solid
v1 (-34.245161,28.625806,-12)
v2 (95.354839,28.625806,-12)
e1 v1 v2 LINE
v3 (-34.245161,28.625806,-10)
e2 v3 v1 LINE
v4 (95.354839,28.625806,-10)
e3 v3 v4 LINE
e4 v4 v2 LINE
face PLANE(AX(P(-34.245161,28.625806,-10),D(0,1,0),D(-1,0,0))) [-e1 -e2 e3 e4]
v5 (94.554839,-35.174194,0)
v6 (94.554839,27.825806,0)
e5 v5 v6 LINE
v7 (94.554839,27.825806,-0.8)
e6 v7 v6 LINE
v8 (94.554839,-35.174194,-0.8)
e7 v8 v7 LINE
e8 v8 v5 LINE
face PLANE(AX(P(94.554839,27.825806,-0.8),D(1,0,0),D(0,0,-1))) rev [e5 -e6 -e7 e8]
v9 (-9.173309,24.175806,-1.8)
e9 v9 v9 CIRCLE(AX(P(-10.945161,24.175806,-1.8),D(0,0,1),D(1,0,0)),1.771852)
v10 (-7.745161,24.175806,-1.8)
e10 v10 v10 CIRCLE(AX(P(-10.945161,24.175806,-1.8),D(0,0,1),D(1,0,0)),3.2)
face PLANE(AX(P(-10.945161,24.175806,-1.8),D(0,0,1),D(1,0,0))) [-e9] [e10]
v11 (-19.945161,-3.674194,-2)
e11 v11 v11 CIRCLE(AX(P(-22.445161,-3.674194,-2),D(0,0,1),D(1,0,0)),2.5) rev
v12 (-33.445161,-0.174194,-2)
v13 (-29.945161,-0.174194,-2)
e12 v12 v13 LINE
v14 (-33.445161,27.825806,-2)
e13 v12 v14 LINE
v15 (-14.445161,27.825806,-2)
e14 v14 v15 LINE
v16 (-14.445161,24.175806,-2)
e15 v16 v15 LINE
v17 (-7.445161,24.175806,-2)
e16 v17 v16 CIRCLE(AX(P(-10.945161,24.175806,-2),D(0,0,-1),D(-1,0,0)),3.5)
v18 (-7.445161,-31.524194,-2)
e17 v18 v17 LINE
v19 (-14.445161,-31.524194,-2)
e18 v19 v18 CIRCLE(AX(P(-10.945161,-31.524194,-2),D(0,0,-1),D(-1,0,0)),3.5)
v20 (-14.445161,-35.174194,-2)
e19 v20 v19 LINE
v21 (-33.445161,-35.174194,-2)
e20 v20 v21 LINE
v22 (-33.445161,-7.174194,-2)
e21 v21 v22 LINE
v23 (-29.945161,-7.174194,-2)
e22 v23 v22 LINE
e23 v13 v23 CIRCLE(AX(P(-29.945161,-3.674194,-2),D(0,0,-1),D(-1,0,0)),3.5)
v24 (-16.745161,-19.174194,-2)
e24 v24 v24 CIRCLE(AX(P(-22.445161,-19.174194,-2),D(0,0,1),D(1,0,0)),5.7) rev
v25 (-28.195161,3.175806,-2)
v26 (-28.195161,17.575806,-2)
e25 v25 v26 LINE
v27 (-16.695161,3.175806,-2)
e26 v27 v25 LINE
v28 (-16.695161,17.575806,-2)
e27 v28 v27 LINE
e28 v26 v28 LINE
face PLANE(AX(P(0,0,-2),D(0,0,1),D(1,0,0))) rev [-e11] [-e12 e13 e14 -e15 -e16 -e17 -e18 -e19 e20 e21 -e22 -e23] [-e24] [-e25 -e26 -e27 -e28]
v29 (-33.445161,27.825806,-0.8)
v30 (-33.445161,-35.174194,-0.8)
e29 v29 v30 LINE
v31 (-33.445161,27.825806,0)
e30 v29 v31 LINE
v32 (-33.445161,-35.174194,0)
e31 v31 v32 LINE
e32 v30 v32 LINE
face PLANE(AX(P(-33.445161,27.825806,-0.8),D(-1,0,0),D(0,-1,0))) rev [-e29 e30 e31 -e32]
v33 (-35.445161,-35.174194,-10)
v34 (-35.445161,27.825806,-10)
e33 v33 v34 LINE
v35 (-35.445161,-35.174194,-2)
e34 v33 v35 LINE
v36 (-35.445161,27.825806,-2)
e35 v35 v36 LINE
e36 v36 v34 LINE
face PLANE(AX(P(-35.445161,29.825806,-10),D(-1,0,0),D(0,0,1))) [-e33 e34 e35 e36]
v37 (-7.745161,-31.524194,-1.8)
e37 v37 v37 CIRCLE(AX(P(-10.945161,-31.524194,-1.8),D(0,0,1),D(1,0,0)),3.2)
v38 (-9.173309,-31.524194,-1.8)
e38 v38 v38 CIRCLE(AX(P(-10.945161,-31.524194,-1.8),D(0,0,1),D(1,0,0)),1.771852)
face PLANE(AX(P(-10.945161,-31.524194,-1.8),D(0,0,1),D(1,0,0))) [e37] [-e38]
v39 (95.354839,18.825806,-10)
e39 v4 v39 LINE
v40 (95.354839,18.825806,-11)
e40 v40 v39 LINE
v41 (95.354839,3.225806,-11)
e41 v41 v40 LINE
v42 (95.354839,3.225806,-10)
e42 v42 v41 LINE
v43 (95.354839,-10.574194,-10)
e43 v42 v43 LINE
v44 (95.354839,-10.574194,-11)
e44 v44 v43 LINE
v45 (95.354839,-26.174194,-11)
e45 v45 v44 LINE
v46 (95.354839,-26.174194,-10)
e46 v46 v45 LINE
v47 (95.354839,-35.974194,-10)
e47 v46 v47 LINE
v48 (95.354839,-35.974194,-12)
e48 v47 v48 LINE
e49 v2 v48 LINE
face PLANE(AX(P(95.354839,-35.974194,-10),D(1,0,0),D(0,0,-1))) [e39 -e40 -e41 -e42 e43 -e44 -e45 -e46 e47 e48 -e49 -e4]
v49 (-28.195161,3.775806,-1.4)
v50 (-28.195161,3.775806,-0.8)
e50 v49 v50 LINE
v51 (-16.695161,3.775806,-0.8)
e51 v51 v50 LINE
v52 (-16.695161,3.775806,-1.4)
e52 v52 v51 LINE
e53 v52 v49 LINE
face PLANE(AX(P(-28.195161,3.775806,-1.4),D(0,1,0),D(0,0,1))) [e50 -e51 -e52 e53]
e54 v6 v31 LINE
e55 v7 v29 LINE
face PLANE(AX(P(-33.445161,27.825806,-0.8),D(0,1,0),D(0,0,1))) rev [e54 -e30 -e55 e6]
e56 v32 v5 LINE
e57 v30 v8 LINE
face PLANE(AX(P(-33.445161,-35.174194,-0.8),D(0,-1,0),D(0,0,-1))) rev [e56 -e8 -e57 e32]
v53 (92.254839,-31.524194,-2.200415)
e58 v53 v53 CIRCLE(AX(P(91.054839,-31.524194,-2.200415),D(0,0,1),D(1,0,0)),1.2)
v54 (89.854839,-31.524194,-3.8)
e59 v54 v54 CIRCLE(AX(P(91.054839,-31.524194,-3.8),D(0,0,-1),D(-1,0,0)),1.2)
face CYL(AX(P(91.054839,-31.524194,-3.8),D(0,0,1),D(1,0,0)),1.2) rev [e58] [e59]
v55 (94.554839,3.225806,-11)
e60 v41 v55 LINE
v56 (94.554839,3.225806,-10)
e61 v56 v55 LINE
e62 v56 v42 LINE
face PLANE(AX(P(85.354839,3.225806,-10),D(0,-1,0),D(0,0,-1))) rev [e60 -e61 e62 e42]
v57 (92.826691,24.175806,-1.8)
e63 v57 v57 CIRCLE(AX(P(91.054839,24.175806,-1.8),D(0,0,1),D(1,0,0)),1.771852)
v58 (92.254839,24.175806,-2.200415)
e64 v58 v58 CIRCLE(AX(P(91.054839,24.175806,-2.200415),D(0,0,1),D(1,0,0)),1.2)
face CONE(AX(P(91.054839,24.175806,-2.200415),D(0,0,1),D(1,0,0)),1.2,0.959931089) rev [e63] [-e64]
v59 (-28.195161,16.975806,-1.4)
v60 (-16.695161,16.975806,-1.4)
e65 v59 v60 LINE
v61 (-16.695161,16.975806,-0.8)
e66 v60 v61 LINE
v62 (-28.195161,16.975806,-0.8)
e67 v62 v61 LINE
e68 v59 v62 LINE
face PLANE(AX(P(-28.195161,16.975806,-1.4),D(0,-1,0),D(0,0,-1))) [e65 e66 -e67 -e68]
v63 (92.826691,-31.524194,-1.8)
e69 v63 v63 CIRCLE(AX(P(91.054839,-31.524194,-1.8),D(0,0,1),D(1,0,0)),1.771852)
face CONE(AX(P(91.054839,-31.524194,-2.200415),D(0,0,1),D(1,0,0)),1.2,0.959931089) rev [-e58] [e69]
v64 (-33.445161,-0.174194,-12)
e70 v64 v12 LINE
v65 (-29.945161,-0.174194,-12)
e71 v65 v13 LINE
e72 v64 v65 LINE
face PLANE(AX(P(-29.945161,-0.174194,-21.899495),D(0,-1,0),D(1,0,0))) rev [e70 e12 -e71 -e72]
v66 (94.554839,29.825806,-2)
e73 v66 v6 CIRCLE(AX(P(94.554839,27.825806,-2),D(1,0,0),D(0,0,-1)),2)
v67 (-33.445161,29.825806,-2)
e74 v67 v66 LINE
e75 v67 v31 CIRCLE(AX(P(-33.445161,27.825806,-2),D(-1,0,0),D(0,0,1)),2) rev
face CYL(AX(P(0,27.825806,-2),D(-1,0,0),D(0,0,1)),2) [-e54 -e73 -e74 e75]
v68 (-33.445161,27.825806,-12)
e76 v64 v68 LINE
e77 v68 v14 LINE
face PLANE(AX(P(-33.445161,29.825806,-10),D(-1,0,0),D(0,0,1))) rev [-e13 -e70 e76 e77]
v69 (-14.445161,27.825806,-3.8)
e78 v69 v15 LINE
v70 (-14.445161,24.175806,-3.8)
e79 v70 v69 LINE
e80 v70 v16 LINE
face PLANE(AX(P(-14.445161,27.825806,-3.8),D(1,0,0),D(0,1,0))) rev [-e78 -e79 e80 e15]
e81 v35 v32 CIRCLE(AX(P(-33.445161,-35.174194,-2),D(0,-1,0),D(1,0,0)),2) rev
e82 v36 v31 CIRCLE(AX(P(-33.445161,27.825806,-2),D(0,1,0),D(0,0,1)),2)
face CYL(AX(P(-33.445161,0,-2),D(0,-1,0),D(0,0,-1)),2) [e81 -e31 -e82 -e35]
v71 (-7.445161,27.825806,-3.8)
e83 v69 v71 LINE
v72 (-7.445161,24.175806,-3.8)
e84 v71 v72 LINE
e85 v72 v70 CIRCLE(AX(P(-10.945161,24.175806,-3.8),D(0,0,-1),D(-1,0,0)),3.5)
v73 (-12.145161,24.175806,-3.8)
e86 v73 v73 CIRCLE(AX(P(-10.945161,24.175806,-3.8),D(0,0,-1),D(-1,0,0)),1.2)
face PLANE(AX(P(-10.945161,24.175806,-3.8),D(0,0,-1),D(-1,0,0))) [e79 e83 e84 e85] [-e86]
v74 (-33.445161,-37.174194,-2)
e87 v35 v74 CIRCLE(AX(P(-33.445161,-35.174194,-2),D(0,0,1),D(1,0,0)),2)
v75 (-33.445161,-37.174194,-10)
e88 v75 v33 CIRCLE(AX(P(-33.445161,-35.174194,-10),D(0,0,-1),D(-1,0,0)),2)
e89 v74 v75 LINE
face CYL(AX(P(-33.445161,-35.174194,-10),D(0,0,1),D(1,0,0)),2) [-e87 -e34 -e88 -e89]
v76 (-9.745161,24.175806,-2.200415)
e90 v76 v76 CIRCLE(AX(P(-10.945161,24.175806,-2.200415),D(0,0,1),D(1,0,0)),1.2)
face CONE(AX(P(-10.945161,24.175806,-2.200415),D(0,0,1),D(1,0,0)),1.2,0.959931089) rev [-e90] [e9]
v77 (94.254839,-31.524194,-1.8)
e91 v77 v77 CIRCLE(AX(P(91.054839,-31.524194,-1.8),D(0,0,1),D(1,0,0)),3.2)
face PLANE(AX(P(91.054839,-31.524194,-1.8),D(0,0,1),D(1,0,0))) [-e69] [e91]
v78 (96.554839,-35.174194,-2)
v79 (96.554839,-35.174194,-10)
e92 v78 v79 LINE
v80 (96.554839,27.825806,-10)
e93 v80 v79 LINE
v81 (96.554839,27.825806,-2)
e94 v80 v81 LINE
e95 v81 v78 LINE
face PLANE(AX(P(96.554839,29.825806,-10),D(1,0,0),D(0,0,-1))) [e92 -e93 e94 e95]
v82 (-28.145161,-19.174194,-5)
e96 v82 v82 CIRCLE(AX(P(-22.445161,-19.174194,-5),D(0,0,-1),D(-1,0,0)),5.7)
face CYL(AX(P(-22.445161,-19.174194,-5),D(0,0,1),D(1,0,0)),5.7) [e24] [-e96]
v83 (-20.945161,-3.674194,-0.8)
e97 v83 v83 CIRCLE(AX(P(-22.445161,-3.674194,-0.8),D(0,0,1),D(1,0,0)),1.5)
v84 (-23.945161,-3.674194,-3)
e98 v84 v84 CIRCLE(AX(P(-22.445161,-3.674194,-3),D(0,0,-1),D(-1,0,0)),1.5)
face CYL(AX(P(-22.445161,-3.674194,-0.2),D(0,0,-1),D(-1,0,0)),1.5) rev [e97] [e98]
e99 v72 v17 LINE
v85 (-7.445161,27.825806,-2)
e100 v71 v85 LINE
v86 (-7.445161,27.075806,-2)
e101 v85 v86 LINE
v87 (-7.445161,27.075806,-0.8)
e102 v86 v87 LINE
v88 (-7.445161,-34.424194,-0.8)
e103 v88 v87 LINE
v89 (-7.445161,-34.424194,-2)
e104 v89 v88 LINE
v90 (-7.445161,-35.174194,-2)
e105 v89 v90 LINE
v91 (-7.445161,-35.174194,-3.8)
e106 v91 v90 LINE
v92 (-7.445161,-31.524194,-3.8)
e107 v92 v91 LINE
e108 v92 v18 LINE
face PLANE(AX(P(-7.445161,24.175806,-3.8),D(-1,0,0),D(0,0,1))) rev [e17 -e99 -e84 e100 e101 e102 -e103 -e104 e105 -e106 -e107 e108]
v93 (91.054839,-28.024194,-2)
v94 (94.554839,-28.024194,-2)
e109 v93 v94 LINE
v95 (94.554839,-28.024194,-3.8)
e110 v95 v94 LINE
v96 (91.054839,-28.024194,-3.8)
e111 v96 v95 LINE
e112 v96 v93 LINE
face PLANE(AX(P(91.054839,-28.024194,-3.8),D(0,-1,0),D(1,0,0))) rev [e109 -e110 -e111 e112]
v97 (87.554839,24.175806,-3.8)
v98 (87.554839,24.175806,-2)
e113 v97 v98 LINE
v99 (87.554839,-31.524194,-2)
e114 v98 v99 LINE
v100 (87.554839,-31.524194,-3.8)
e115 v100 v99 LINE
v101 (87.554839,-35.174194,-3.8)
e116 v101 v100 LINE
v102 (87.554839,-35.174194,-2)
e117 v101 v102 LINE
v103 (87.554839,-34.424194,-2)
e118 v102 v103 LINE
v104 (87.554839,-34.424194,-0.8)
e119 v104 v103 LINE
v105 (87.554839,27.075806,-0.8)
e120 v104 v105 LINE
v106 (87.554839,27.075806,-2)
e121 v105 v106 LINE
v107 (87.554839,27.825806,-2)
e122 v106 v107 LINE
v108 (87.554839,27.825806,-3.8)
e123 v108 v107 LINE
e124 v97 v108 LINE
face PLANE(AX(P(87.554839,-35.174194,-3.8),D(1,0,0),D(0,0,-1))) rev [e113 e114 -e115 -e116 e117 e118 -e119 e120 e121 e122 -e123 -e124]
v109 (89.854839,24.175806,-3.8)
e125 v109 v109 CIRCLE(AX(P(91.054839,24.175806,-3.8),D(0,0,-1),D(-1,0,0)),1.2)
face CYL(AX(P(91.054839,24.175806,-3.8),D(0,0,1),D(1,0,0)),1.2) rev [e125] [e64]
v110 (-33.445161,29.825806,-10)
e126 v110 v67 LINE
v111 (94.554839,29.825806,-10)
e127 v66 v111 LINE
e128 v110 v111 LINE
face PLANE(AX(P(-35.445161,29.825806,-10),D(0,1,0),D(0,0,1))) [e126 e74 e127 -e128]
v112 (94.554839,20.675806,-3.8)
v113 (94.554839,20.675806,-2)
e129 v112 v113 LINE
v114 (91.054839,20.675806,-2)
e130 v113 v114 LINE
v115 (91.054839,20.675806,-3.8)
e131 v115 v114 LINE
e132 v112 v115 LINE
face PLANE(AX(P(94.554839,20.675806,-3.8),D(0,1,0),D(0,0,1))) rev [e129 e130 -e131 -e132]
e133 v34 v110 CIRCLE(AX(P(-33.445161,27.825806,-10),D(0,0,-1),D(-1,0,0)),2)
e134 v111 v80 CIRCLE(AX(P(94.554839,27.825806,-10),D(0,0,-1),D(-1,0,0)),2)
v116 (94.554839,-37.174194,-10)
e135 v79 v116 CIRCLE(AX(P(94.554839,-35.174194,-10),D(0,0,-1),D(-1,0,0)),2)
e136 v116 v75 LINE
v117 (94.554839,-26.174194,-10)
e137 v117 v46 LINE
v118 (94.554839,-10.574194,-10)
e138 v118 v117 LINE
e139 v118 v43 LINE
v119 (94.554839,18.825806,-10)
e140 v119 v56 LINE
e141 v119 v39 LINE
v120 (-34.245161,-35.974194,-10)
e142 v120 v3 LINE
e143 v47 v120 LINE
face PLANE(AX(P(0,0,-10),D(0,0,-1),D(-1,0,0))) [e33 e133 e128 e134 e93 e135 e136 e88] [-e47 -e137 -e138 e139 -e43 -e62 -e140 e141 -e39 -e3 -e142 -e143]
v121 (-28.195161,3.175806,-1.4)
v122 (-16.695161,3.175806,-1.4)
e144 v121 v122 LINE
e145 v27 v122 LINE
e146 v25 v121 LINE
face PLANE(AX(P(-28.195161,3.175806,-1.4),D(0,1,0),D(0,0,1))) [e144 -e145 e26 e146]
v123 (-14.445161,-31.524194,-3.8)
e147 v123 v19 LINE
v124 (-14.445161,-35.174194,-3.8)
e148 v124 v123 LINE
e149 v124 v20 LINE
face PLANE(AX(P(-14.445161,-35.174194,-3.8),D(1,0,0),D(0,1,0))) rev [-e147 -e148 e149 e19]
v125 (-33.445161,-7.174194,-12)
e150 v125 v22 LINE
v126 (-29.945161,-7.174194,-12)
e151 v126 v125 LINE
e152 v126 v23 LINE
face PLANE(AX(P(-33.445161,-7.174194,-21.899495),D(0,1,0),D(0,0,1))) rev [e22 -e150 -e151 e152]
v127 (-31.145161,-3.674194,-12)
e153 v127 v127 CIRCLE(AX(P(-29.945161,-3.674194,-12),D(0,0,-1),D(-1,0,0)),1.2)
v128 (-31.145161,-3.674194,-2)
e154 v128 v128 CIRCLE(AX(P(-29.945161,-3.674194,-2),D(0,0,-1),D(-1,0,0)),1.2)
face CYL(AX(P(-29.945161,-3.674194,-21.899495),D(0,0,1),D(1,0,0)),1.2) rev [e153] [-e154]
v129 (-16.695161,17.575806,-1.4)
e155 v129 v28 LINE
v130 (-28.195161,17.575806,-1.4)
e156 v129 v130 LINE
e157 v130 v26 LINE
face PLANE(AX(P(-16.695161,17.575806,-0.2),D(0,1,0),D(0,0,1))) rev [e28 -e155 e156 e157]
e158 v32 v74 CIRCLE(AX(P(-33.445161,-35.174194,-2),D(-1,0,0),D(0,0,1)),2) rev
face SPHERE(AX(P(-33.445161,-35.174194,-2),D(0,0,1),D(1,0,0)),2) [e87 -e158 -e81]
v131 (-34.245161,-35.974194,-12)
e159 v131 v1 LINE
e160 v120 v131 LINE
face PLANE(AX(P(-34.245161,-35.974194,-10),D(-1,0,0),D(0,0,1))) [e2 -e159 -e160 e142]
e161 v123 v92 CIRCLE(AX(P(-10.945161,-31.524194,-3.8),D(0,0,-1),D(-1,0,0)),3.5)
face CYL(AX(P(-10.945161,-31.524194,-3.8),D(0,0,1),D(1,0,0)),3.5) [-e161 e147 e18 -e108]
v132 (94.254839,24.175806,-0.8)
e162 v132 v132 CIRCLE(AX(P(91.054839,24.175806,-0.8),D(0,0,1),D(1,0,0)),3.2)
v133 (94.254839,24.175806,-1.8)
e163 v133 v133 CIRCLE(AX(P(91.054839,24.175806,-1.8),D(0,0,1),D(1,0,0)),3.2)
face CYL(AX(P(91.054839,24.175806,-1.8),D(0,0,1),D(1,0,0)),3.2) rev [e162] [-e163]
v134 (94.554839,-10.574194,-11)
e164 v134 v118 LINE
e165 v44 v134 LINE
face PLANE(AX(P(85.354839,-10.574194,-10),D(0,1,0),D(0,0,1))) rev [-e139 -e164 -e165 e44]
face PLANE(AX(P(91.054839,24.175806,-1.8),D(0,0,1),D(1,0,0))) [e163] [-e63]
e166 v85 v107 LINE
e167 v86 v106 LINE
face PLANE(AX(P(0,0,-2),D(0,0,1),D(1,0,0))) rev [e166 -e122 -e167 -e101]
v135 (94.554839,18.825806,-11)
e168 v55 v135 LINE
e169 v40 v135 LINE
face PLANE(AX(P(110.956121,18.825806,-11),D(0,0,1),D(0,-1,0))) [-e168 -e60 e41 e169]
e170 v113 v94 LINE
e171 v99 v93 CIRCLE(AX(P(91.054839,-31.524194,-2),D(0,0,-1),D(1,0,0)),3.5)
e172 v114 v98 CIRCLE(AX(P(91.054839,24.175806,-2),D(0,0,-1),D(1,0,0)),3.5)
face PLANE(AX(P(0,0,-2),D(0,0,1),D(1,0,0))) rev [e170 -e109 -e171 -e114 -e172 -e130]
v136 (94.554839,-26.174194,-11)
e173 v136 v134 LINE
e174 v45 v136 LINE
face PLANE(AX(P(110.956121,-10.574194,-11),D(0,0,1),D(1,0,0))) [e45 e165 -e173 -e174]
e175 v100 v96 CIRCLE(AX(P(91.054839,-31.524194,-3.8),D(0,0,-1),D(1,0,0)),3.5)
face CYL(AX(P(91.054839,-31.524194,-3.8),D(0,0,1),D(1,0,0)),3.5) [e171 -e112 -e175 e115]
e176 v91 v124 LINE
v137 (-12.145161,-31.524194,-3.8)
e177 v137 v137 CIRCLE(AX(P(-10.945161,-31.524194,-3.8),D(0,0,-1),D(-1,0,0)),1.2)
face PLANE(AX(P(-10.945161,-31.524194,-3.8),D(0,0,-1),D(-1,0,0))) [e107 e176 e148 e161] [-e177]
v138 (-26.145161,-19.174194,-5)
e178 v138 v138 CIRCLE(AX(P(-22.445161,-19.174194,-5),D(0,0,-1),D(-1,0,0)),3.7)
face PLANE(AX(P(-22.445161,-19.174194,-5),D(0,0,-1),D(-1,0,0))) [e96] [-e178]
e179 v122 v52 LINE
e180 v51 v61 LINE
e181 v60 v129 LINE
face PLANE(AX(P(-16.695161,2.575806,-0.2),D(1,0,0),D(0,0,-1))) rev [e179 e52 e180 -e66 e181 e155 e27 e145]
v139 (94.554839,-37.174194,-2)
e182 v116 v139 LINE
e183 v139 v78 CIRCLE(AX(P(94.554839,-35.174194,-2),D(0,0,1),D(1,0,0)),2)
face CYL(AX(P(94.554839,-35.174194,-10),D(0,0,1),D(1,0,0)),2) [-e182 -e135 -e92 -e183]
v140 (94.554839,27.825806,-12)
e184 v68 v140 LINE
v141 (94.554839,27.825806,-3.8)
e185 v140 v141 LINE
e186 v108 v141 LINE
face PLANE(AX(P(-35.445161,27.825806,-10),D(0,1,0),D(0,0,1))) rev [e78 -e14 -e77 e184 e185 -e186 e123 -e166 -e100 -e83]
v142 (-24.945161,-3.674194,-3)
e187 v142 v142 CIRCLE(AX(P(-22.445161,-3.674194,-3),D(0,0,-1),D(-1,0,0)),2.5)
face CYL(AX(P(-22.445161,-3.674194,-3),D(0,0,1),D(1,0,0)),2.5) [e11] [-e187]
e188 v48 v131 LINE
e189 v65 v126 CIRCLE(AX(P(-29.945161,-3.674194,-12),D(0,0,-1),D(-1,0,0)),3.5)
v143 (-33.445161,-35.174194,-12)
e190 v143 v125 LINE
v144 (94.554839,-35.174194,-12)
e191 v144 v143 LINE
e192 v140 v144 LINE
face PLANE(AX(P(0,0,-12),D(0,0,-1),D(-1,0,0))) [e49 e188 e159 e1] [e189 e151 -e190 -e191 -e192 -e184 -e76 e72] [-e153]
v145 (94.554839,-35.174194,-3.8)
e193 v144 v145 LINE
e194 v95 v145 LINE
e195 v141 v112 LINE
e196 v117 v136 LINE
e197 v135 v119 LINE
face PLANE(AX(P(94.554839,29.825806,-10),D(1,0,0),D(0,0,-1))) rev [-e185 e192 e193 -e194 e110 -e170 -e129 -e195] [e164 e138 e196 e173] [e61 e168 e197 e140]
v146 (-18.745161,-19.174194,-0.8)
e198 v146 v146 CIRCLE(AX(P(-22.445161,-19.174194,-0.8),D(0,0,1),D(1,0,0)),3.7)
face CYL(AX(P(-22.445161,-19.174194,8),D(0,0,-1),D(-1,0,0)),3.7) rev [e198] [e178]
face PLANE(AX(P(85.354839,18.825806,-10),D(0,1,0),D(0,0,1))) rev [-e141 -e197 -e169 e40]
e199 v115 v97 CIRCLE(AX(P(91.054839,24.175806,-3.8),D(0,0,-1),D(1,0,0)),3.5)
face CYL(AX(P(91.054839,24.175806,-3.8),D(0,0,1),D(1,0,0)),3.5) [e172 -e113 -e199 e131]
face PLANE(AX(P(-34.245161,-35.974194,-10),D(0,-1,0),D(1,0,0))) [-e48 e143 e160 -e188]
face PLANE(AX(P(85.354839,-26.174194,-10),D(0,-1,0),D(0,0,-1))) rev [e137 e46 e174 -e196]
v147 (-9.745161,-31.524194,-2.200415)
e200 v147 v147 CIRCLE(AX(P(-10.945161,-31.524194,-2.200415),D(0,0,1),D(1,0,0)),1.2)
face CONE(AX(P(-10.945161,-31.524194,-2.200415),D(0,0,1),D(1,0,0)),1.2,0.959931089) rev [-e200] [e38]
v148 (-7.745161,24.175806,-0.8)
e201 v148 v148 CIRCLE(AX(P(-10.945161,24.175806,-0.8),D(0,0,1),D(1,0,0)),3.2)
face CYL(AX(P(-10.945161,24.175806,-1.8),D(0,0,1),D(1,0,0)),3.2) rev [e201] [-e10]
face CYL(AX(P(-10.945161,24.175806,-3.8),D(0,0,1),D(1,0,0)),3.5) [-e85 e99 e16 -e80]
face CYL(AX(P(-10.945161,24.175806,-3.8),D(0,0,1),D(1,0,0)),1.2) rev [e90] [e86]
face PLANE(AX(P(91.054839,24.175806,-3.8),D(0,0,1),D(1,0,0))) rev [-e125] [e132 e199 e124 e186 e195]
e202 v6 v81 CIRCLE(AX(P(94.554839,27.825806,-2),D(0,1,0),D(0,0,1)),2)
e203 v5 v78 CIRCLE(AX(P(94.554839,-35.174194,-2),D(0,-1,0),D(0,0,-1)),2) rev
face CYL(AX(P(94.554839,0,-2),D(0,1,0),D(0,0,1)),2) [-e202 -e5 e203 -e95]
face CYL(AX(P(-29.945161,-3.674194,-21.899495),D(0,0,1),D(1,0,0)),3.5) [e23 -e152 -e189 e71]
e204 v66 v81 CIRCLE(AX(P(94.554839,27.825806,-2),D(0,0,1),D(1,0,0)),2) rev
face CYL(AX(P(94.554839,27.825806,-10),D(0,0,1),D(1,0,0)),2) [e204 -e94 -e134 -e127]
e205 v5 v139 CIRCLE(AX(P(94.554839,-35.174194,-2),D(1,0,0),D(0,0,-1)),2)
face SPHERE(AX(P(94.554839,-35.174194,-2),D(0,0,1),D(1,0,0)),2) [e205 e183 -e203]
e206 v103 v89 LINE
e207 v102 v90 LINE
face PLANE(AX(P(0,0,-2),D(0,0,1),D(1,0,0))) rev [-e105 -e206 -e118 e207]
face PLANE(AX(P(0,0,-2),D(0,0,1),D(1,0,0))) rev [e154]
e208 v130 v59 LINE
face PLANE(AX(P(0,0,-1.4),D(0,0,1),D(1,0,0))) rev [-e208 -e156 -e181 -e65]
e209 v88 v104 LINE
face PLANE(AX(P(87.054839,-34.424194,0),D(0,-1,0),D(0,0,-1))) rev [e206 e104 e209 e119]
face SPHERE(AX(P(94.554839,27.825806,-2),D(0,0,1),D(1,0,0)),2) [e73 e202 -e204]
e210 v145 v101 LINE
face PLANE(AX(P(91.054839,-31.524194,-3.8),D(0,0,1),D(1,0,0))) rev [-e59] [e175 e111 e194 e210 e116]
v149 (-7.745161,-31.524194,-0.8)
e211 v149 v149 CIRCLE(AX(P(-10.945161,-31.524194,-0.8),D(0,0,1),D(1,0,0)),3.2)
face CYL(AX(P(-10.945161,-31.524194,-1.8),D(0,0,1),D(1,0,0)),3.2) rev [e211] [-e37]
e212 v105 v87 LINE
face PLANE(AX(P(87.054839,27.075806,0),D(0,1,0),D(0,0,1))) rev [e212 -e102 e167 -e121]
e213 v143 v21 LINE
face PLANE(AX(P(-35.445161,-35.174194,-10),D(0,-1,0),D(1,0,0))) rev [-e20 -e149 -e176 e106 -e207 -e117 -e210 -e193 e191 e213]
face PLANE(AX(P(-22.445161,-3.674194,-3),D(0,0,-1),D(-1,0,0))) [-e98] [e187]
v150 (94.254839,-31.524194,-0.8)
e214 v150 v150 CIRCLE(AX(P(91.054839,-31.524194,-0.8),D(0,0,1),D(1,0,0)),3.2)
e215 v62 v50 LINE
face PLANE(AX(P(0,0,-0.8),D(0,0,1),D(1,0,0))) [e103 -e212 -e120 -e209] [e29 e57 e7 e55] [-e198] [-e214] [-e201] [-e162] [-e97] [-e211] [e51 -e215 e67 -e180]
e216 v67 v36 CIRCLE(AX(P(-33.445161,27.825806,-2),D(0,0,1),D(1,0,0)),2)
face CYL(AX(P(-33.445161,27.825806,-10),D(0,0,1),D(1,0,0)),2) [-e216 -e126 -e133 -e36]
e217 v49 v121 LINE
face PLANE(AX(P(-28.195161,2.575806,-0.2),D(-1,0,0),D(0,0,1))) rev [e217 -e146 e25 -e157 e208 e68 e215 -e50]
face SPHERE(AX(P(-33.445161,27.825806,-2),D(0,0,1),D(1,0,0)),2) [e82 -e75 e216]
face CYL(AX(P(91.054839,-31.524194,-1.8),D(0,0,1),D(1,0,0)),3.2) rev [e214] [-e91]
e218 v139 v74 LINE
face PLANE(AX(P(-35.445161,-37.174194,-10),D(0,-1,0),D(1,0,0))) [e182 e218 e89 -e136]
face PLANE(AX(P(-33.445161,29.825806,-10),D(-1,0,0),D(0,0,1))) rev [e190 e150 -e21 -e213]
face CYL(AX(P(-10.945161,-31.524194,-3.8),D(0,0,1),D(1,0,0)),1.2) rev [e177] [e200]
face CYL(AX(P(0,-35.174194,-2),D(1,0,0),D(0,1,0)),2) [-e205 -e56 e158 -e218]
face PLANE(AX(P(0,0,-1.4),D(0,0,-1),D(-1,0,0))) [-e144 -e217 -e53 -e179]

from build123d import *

# Parameters (mm, degrees)
SKETCH_1_W           = 132
SKETCH_1_H           = 67
EXTRUDE_1_DEPTH      = 10
SHELL_1_T            = -2
SKETCH_3_W           = 132
SKETCH_3_H           = 67
SKETCH_3_W_2         = 130.4
SKETCH_3_H_2         = 65.4
EXTRUDE_2_DEPTH      = 2
SKETCH_4_W           = 132
SKETCH_4_H           = 67
EXTRUDE_3_DEPTH      = 2
SKETCH_5_W           = 85
SKETCH_5_H           = 57
CUT_EXTRUDE_2_DEPTH  = 2
SKETCH_6_R           = 3.5
CUT_EXTRUDE_3_DEPTH  = 2
SKETCH_7_W           = 127
SKETCH_7_H           = 62
CUT_EXTRUDE_4_DEPTH  = 0.8
SKETCH_8_W           = 0.8
SKETCH_8_H           = 17.8
EXTRUDE_4_DEPTH      = 1.2
SKETCH_9_W           = 130.4
SKETCH_9_H           = 65.4
SKETCH_9_W_2         = 128
SKETCH_9_H_2         = 63
EXTRUDE_5_DEPTH      = 2
SKETCH_10_W          = 132
SKETCH_10_H          = 67
SKETCH_10_W_2        = 129.6
SKETCH_10_H_2        = 64.6
CUT_EXTRUDE_5_DEPTH  = 2
SKETCH_11_W          = 95
SKETCH_11_H          = 61.5
CUT_EXTRUDE_6_DEPTH  = 2
SKETCH_12_W          = 128
SKETCH_12_H          = 63
CUT_EXTRUDE_7_DEPTH  = 0.8
SKETCH_14_R          = 1.2
EXTRUDE_6_DEPTH      = 1.8
SKETCH_15_W          = 0.5
SKETCH_15_H          = 61.5
EXTRUDE_7_DEPTH      = 1.2
SKETCH_16_W          = 0.5
SKETCH_16_H          = 61.5
CUT_EXTRUDE_8_DEPTH  = 1.8
CUT_EXTRUDE_START    = -1.8
SKETCH_17_R          = 1.2
CUT_EXTRUDE_9_DEPTH  = 1.8
SKETCH_19_R          = 3.5
CUT_EXTRUDE_11_DEPTH = 1.8
SKETCH_22_R          = 3.5
EXTRUDE_9_DEPTH      = 1.2
SKETCH_23_R          = 1.5
SKETCH_23_W          = 11.5
SKETCH_23_H          = 15
CUT_EXTRUDE_13_DEPTH = 1.8
EXTRUDE_START        = 1
SKETCH_24_R          = 2.5
SKETCH_24_R_2        = 1.5
EXTRUDE_10_DEPTH     = 1
CHAMFER_1_SIZE       = 2
CHAMFER_1_SIZE2      = 1.400415076
SKETCH_25_R          = 1.2
EXTRUDE_11_DEPTH     = 10
SKETCH_26_W          = 1.2
SKETCH_26_H          = 15.6
CUT_EXTRUDE_14_DEPTH = 10
SKETCH_27_W          = 11.5
SKETCH_27_H          = 0.6
EXTRUDE_12_DEPTH     = 0.6
FILLET_1_R           = 2
SKETCH_28_R          = 3.7
CUT_EXTRUDE_15_DEPTH = 10
EXTRUDE_START_2      = 3
SKETCH_29_R          = 5.7
SKETCH_29_R_2        = 3.7
EXTRUDE_13_DEPTH     = 3
SKETCH_30_W          = 11.5
SKETCH_30_H          = 0.6
EXTRUDE_14_DEPTH     = 0.6
SKETCH_32_W          = 11.5
SKETCH_32_H          = 0.6
EXTRUDE_15_DEPTH     = 0.6
SKETCH_33_W          = 0.2
SKETCH_33_H          = 15.6
EXTRUDE_16_DEPTH     = 0.8
SKETCH_34_R          = 3.2
CUT_EXTRUDE_16_DEPTH = 1
SKETCH_35_R          = 3.2
CUT_EXTRUDE_17_DEPTH = 1


with BuildPart() as part:
    # Эскиз1 → Бобышка-Вытянуть1 (new body)
    with BuildSketch(Plane.XY):
        with Locations((30.55483871, -3.674193548)):
            Rectangle(SKETCH_1_W, SKETCH_1_H)
    extrude(amount=-EXTRUDE_1_DEPTH)

    # Оболочка1
    shell_1_openings = [part.faces().sort_by_distance(p)[0] for p in [
        (30.55483871, -3.674193548, -10),
        (30.55483871, -3.674193548, 0),
    ]]
    offset(amount=SHELL_1_T, openings=shell_1_openings, kind=Kind.INTERSECTION)

    # Эскиз3 → Бобышка-Вытянуть2 (add)
    with BuildSketch(Plane(origin=(0, 0, -10), x_dir=(-1, 0, 0), z_dir=(0, 0, -1))):
        with Locations((-30.55483871, -3.674193548)):
            Rectangle(SKETCH_3_W, SKETCH_3_H)
        with Locations((-30.55483871, -3.674193548)):
            Rectangle(SKETCH_3_W_2, SKETCH_3_H_2, mode=Mode.SUBTRACT)
    extrude(amount=EXTRUDE_2_DEPTH)

    # Эскиз4 → Бобышка-Вытянуть3 (add)
    with BuildSketch(Plane.XY):
        with Locations((30.55483871, -3.674193548)):
            Rectangle(SKETCH_4_W, SKETCH_4_H)
    extrude(amount=-EXTRUDE_3_DEPTH)

    # Эскиз5 → Вырез-Вытянуть2 (cut)
    with BuildSketch(Plane(origin=(0, 0, -2), x_dir=(-1, 0, 0), z_dir=(0, 0, -1))):
        with Locations((-43.05483871, -3.674193548)):
            Rectangle(SKETCH_5_W, SKETCH_5_H)
    extrude(amount=-CUT_EXTRUDE_2_DEPTH, mode=Mode.SUBTRACT)

    # Эскиз6 → Вырез-Вытянуть3 (cut)
    with BuildSketch(Plane(origin=(0, 0, -2), x_dir=(-1, 0, 0), z_dir=(0, 0, -1))):
        with Locations((21.94516129, -3.674193548)):
            Circle(SKETCH_6_R)
    extrude(amount=-CUT_EXTRUDE_3_DEPTH, mode=Mode.SUBTRACT)

    # Эскиз7 → Вырез-Вытянуть4 (cut)
    with BuildSketch(Plane.XY):
        with Locations((30.55483871, -3.674193548)):
            Rectangle(SKETCH_7_W, SKETCH_7_H)
    extrude(amount=-CUT_EXTRUDE_4_DEPTH, mode=Mode.SUBTRACT)

    # Эскиз8 → Бобышка-Вытянуть4 (add)
    with BuildSketch(Plane.ZY.offset(-95.75483871)):
        with Locations((-11.6, 14.525806452)):
            Rectangle(SKETCH_8_W, SKETCH_8_H)
        with Locations((-11.6, -21.874193548)):
            Rectangle(SKETCH_8_W, SKETCH_8_H)
    extrude(amount=EXTRUDE_4_DEPTH)

    # Эскиз9 → Бобышка-Вытянуть5 (add)
    with BuildSketch(Plane(origin=(0, 0, -12), x_dir=(-1, 0, 0), z_dir=(0, 0, -1))):
        with Locations((-30.55483871, -3.674193548)):
            Rectangle(SKETCH_9_W, SKETCH_9_H)
        with Locations((-30.55483871, -3.674193548)):
            Rectangle(SKETCH_9_W_2, SKETCH_9_H_2, mode=Mode.SUBTRACT)
    extrude(amount=-EXTRUDE_5_DEPTH)

    # Эскиз10 → Вырез-Вытянуть5 (cut)
    with BuildSketch(Plane(origin=(0, 0, -12), x_dir=(-1, 0, 0), z_dir=(0, 0, -1))):
        with Locations((-30.55483871, -3.674193548)):
            Rectangle(SKETCH_10_W, SKETCH_10_H)
        with Locations((-30.55483871, -3.674193548)):
            Rectangle(SKETCH_10_W_2, SKETCH_10_H_2, mode=Mode.SUBTRACT)
    extrude(amount=-CUT_EXTRUDE_5_DEPTH, mode=Mode.SUBTRACT)

    # Эскиз11 → Вырез-Вытянуть6 (cut)
    with BuildSketch(Plane(origin=(0, 0, -2), x_dir=(-1, 0, 0), z_dir=(0, 0, -1))):
        with Locations((-39.55483871, -3.674193548)):
            Rectangle(SKETCH_11_W, SKETCH_11_H)
    extrude(amount=-CUT_EXTRUDE_6_DEPTH, mode=Mode.SUBTRACT)

    # Эскиз12 → Вырез-Вытянуть7 (cut)
    with BuildSketch(Plane.XY):
        with Locations((30.55483871, -3.674193548)):
            Rectangle(SKETCH_12_W, SKETCH_12_H)
    extrude(amount=-CUT_EXTRUDE_7_DEPTH, mode=Mode.SUBTRACT)

    # Эскиз14 → Бобышка-Вытянуть6 (add)
    # profile 1 of 4: a face of its own
    with BuildSketch(Plane(origin=(0, 0, -2), x_dir=(-1, 0, 0), z_dir=(0, 0, -1))):
        with BuildLine():
            Line((-94.55483871, -28.024193548), (-94.55483871, -35.174193548))
            Line((-94.55483871, -35.174193548), (-87.55483871, -35.174193548))
            Line((-87.55483871, -35.174193548), (-87.55483871, -31.524193548))
            ThreePointArc((-87.55483871, -31.524193548), (-88.579964976, -29.049319814), (-91.05483871, -28.024193548))
            Line((-91.05483871, -28.024193548), (-94.55483871, -28.024193548))
        make_face()
        with Locations((-91.05483871, -31.524193548)):
            Circle(SKETCH_14_R, mode=Mode.SUBTRACT)
    # profile 2 of 4: a face of its own
    with BuildSketch(Plane(origin=(0, 0, -2), x_dir=(-1, 0, 0), z_dir=(0, 0, -1))):
        with BuildLine():
            Line((-87.55483871, 24.175806452), (-87.55483871, 27.825806452))
            Line((-87.55483871, 27.825806452), (-94.55483871, 27.825806452))
            Line((-94.55483871, 27.825806452), (-94.55483871, 20.675806452))
            Line((-94.55483871, 20.675806452), (-91.05483871, 20.675806452))
            ThreePointArc((-91.05483871, 20.675806452), (-88.579964976, 21.700932717), (-87.55483871, 24.175806452))
        make_face()
        with Locations((-91.05483871, 24.175806452)):
            Circle(SKETCH_14_R, mode=Mode.SUBTRACT)
    # profile 3 of 4: a face of its own
    with BuildSketch(Plane(origin=(0, 0, -2), x_dir=(-1, 0, 0), z_dir=(0, 0, -1))):
        with BuildLine():
            Line((7.44516129, 24.175806452), (7.44516129, 27.825806452))
            Line((7.44516129, 27.825806452), (14.44516129, 27.825806452))
            Line((14.44516129, 27.825806452), (14.44516129, 24.175806452))
            ThreePointArc((14.44516129, 24.175806452), (10.94516129, 20.675806452), (7.44516129, 24.175806452))
        make_face()
        with Locations((10.94516129, 24.175806452)):
            Circle(SKETCH_14_R, mode=Mode.SUBTRACT)
    # profile 4 of 4: a face of its own
    with BuildSketch(Plane(origin=(0, 0, -2), x_dir=(-1, 0, 0), z_dir=(0, 0, -1))):
        with BuildLine():
            Line((7.44516129, -31.524193548), (7.44516129, -35.174193548))
            Line((7.44516129, -35.174193548), (14.44516129, -35.174193548))
            Line((14.44516129, -35.174193548), (14.44516129, -31.524193548))
            ThreePointArc((14.44516129, -31.524193548), (10.94516129, -28.024193548), (7.44516129, -31.524193548))
        make_face()
        with Locations((10.94516129, -31.524193548)):
            Circle(SKETCH_14_R, mode=Mode.SUBTRACT)
    extrude(amount=EXTRUDE_6_DEPTH)

    # Эскиз15 → Бобышка-Вытянуть7 (add)
    with BuildSketch(Plane.XY.offset(-0.8)):
        with Locations((-7.69516129, -3.674193548)):
            Rectangle(SKETCH_15_W, SKETCH_15_H)
    extrude(amount=-EXTRUDE_7_DEPTH)

    # Эскиз16 → Вырез-Вытянуть8 (cut)
    with BuildSketch(Plane(origin=(0, 0, -2), x_dir=(-1, 0, 0), z_dir=(0, 0, -1))):
        with Locations((-87.30483871, -3.674193548)):
            Rectangle(SKETCH_16_W, SKETCH_16_H)
    extrude(amount=-CUT_EXTRUDE_8_DEPTH, mode=Mode.SUBTRACT)

    # Эскиз17 → Вырез-Вытянуть9 (cut)
    with BuildSketch(Plane(origin=(0, 0, -2), x_dir=(-1, 0, 0), z_dir=(0, 0, -1)).offset(CUT_EXTRUDE_START)):
        with Locations(Location((-91.05483871, 24.175806452, 0), (0, 0, 180))):
            Circle(SKETCH_17_R)
        with Locations(Location((-91.05483871, -31.524193548, 0), (0, 0, 180))):
            Circle(SKETCH_17_R)
        with Locations(Location((10.94516129, -31.524193548, 0), (0, 0, 180))):
            Circle(SKETCH_17_R)
        with Locations(Location((10.94516129, 24.175806452, 0), (0, 0, 180))):
            Circle(SKETCH_17_R)
    extrude(amount=CUT_EXTRUDE_9_DEPTH, mode=Mode.SUBTRACT)

    # Эскиз19 → Вырез-Вытянуть11 (cut)
    with BuildSketch(Plane(origin=(0, 0, -2), x_dir=(-1, 0, 0), z_dir=(0, 0, -1))):
        with Locations((22.44516129, -19.174193548)):
            Circle(SKETCH_19_R)
    extrude(amount=-CUT_EXTRUDE_11_DEPTH, mode=Mode.SUBTRACT)

    # Эскиз22 → Бобышка-Вытянуть9 (add)
    with BuildSketch(Plane(origin=(0, 0, -2), x_dir=(-1, 0, 0), z_dir=(0, 0, -1))):
        with Locations((21.94516129, -3.674193548)):
            Circle(SKETCH_22_R)
    extrude(amount=-EXTRUDE_9_DEPTH)

    # Эскиз23 → Вырез-Вытянуть13 (cut)
    with BuildSketch(Plane(origin=(0, 0, -2), x_dir=(-1, 0, 0), z_dir=(0, 0, -1))):
        with Locations((22.44516129, -3.674193548)):
            Circle(SKETCH_23_R)
        with Locations((22.44516129, 10.075806452)):
            Rectangle(SKETCH_23_W, SKETCH_23_H)
    extrude(amount=-CUT_EXTRUDE_13_DEPTH, mode=Mode.SUBTRACT)

    # Эскиз24 → Бобышка-Вытянуть10 (add)
    with BuildSketch(Plane(origin=(0, 0, -2), x_dir=(-1, 0, 0), z_dir=(0, 0, -1)).offset(EXTRUDE_START)):
        with Locations(Location((22.44516129, -3.674193548, 0), (0, 0, 180))):
            Circle(SKETCH_24_R)
        with Locations((22.44516129, -3.674193548)):
            Circle(SKETCH_24_R_2, mode=Mode.SUBTRACT)
    extrude(amount=-EXTRUDE_10_DEPTH)

    # Фаска1
    chamfer_1_edges = [part.edges().sort_by_distance(p)[0] for p in [
        (-12.14516129, 24.175806452, -0.8),
        (-12.14516129, -31.524193548, -0.8),
        (89.85483871, -31.524193548, -0.8),
        (89.85483871, 24.175806452, -0.8),
    ]]
    chamfer_1_side = [part.faces().sort_by_distance(p)[0] for p in [
        (30.55483871, 27.683142511, -0.8),
    ]]
    chamfer(chamfer_1_edges, length=CHAMFER_1_SIZE, length2=CHAMFER_1_SIZE2, reference=chamfer_1_side[0])

    # Эскиз25 → Бобышка-Вытянуть11 (add)
    with BuildSketch(Plane(origin=(0, 0, -2), x_dir=(-1, 0, 0), z_dir=(0, 0, -1))):
        with BuildLine():
            Line((29.94516129, -0.174193548), (33.44516129, -0.174193548))
            Line((33.44516129, -0.174193548), (33.44516129, -7.174193548))
            Line((33.44516129, -7.174193548), (29.94516129, -7.174193548))
            ThreePointArc((29.94516129, -7.174193548), (26.44516129, -3.674193548), (29.94516129, -0.174193548))
        make_face()
        with Locations((29.94516129, -3.674193548)):
            Circle(SKETCH_25_R, mode=Mode.SUBTRACT)
    extrude(amount=EXTRUDE_11_DEPTH)

    # Эскиз26 → Вырез-Вытянуть14 (cut)
    with BuildSketch(Plane(origin=(95.35483871, 0, 0), x_dir=(0, 0, -1), z_dir=(1, 0, 0))):
        with Locations((10.6, 11.025806452)):
            Rectangle(SKETCH_26_W, SKETCH_26_H)
        with Locations((10.6, -18.374193548)):
            Rectangle(SKETCH_26_W, SKETCH_26_H)
    extrude(amount=-CUT_EXTRUDE_14_DEPTH, mode=Mode.SUBTRACT)

    # Эскиз27 → Бобышка-Вытянуть12 (add)
    with BuildSketch(Plane.XY.offset(-0.8)):
        with Locations((-22.44516129, 17.275806452)):
            Rectangle(SKETCH_27_W, SKETCH_27_H)
        with Locations((-22.44516129, 2.875806452)):
            Rectangle(SKETCH_27_W, SKETCH_27_H)
    extrude(amount=-EXTRUDE_12_DEPTH)

    # Скругление1
    fillet_1_edges = [part.edges().sort_by_distance(p)[0] for p in [
        (-35.44516129, -37.174193548, -5),
        (96.55483871, -37.174193548, -5),
        (96.55483871, 29.825806452, -5),
        (-35.44516129, 29.825806452, -5),
        (30.55483871, 29.825806452, 0),
        (96.55483871, -3.674193548, 0),
        (30.55483871, -37.174193548, 0),
        (-35.44516129, -3.674193548, 0),
    ]]
    fillet(fillet_1_edges, radius=FILLET_1_R - 0.0001)  # a hair under: the kernel refuses the full size

    # Эскиз28 → Вырез-Вытянуть15 (cut)
    with BuildSketch(Plane(origin=(0, 0, -2), x_dir=(-1, 0, 0), z_dir=(0, 0, -1))):
        with Locations((22.44516129, -19.174193548)):
            Circle(SKETCH_28_R)
    extrude(amount=-CUT_EXTRUDE_15_DEPTH, mode=Mode.SUBTRACT)

    # Эскиз29 → Бобышка-Вытянуть13 (add)
    with BuildSketch(Plane(origin=(0, 0, -2), x_dir=(-1, 0, 0), z_dir=(0, 0, -1)).offset(EXTRUDE_START_2)):
        with Locations(Location((22.44516129, -19.174193548, 0), (0, 0, 180))):
            Circle(SKETCH_29_R)
        with Locations((22.44516129, -19.174193548)):
            Circle(SKETCH_29_R_2, mode=Mode.SUBTRACT)
    extrude(amount=-EXTRUDE_13_DEPTH)

    # Эскиз30 → Бобышка-Вытянуть14 (add)
    with BuildSketch(Plane(origin=(0, 0, -1.4), x_dir=(-1, 0, 0), z_dir=(0, 0, -1))):
        with Locations((22.44516129, 2.875806452)):
            Rectangle(SKETCH_30_W, SKETCH_30_H)
    extrude(amount=EXTRUDE_14_DEPTH)

    # Эскиз32 → Бобышка-Вытянуть15 (add)
    with BuildSketch(Plane.XY.offset(-0.8)):
        with Locations((-22.44516129, 3.475806452)):
            Rectangle(SKETCH_32_W, SKETCH_32_H)
    extrude(amount=-EXTRUDE_15_DEPTH)

    # Эскиз33 → Бобышка-Вытянуть16 (add)
    with BuildSketch(Plane.ZY.offset(-94.55483871)):
        with Locations((-11.1, 11.025806452)):
            Rectangle(SKETCH_33_W, SKETCH_33_H)
        with Locations((-11.1, -18.374193548)):
            Rectangle(SKETCH_33_W, SKETCH_33_H)
    extrude(amount=-EXTRUDE_16_DEPTH)

    # Эскиз34 → Вырез-Вытянуть16 (cut)
    with BuildSketch(Plane.XY.offset(-0.8)):
        with Locations((-10.94516129, 24.175806452)):
            Circle(SKETCH_34_R)
    extrude(amount=-CUT_EXTRUDE_16_DEPTH, mode=Mode.SUBTRACT)

    # Эскиз35 → Вырез-Вытянуть17 (cut)
    with BuildSketch(Plane.XY.offset(-0.8)):
        with Locations((-10.94516129, -31.524193548)):
            Circle(SKETCH_35_R)
        with Locations((91.05483871, -31.524193548)):
            Circle(SKETCH_35_R)
        with Locations((91.05483871, 24.175806452)):
            Circle(SKETCH_35_R)
    extrude(amount=-CUT_EXTRUDE_17_DEPTH, mode=Mode.SUBTRACT)


solid = part.part
